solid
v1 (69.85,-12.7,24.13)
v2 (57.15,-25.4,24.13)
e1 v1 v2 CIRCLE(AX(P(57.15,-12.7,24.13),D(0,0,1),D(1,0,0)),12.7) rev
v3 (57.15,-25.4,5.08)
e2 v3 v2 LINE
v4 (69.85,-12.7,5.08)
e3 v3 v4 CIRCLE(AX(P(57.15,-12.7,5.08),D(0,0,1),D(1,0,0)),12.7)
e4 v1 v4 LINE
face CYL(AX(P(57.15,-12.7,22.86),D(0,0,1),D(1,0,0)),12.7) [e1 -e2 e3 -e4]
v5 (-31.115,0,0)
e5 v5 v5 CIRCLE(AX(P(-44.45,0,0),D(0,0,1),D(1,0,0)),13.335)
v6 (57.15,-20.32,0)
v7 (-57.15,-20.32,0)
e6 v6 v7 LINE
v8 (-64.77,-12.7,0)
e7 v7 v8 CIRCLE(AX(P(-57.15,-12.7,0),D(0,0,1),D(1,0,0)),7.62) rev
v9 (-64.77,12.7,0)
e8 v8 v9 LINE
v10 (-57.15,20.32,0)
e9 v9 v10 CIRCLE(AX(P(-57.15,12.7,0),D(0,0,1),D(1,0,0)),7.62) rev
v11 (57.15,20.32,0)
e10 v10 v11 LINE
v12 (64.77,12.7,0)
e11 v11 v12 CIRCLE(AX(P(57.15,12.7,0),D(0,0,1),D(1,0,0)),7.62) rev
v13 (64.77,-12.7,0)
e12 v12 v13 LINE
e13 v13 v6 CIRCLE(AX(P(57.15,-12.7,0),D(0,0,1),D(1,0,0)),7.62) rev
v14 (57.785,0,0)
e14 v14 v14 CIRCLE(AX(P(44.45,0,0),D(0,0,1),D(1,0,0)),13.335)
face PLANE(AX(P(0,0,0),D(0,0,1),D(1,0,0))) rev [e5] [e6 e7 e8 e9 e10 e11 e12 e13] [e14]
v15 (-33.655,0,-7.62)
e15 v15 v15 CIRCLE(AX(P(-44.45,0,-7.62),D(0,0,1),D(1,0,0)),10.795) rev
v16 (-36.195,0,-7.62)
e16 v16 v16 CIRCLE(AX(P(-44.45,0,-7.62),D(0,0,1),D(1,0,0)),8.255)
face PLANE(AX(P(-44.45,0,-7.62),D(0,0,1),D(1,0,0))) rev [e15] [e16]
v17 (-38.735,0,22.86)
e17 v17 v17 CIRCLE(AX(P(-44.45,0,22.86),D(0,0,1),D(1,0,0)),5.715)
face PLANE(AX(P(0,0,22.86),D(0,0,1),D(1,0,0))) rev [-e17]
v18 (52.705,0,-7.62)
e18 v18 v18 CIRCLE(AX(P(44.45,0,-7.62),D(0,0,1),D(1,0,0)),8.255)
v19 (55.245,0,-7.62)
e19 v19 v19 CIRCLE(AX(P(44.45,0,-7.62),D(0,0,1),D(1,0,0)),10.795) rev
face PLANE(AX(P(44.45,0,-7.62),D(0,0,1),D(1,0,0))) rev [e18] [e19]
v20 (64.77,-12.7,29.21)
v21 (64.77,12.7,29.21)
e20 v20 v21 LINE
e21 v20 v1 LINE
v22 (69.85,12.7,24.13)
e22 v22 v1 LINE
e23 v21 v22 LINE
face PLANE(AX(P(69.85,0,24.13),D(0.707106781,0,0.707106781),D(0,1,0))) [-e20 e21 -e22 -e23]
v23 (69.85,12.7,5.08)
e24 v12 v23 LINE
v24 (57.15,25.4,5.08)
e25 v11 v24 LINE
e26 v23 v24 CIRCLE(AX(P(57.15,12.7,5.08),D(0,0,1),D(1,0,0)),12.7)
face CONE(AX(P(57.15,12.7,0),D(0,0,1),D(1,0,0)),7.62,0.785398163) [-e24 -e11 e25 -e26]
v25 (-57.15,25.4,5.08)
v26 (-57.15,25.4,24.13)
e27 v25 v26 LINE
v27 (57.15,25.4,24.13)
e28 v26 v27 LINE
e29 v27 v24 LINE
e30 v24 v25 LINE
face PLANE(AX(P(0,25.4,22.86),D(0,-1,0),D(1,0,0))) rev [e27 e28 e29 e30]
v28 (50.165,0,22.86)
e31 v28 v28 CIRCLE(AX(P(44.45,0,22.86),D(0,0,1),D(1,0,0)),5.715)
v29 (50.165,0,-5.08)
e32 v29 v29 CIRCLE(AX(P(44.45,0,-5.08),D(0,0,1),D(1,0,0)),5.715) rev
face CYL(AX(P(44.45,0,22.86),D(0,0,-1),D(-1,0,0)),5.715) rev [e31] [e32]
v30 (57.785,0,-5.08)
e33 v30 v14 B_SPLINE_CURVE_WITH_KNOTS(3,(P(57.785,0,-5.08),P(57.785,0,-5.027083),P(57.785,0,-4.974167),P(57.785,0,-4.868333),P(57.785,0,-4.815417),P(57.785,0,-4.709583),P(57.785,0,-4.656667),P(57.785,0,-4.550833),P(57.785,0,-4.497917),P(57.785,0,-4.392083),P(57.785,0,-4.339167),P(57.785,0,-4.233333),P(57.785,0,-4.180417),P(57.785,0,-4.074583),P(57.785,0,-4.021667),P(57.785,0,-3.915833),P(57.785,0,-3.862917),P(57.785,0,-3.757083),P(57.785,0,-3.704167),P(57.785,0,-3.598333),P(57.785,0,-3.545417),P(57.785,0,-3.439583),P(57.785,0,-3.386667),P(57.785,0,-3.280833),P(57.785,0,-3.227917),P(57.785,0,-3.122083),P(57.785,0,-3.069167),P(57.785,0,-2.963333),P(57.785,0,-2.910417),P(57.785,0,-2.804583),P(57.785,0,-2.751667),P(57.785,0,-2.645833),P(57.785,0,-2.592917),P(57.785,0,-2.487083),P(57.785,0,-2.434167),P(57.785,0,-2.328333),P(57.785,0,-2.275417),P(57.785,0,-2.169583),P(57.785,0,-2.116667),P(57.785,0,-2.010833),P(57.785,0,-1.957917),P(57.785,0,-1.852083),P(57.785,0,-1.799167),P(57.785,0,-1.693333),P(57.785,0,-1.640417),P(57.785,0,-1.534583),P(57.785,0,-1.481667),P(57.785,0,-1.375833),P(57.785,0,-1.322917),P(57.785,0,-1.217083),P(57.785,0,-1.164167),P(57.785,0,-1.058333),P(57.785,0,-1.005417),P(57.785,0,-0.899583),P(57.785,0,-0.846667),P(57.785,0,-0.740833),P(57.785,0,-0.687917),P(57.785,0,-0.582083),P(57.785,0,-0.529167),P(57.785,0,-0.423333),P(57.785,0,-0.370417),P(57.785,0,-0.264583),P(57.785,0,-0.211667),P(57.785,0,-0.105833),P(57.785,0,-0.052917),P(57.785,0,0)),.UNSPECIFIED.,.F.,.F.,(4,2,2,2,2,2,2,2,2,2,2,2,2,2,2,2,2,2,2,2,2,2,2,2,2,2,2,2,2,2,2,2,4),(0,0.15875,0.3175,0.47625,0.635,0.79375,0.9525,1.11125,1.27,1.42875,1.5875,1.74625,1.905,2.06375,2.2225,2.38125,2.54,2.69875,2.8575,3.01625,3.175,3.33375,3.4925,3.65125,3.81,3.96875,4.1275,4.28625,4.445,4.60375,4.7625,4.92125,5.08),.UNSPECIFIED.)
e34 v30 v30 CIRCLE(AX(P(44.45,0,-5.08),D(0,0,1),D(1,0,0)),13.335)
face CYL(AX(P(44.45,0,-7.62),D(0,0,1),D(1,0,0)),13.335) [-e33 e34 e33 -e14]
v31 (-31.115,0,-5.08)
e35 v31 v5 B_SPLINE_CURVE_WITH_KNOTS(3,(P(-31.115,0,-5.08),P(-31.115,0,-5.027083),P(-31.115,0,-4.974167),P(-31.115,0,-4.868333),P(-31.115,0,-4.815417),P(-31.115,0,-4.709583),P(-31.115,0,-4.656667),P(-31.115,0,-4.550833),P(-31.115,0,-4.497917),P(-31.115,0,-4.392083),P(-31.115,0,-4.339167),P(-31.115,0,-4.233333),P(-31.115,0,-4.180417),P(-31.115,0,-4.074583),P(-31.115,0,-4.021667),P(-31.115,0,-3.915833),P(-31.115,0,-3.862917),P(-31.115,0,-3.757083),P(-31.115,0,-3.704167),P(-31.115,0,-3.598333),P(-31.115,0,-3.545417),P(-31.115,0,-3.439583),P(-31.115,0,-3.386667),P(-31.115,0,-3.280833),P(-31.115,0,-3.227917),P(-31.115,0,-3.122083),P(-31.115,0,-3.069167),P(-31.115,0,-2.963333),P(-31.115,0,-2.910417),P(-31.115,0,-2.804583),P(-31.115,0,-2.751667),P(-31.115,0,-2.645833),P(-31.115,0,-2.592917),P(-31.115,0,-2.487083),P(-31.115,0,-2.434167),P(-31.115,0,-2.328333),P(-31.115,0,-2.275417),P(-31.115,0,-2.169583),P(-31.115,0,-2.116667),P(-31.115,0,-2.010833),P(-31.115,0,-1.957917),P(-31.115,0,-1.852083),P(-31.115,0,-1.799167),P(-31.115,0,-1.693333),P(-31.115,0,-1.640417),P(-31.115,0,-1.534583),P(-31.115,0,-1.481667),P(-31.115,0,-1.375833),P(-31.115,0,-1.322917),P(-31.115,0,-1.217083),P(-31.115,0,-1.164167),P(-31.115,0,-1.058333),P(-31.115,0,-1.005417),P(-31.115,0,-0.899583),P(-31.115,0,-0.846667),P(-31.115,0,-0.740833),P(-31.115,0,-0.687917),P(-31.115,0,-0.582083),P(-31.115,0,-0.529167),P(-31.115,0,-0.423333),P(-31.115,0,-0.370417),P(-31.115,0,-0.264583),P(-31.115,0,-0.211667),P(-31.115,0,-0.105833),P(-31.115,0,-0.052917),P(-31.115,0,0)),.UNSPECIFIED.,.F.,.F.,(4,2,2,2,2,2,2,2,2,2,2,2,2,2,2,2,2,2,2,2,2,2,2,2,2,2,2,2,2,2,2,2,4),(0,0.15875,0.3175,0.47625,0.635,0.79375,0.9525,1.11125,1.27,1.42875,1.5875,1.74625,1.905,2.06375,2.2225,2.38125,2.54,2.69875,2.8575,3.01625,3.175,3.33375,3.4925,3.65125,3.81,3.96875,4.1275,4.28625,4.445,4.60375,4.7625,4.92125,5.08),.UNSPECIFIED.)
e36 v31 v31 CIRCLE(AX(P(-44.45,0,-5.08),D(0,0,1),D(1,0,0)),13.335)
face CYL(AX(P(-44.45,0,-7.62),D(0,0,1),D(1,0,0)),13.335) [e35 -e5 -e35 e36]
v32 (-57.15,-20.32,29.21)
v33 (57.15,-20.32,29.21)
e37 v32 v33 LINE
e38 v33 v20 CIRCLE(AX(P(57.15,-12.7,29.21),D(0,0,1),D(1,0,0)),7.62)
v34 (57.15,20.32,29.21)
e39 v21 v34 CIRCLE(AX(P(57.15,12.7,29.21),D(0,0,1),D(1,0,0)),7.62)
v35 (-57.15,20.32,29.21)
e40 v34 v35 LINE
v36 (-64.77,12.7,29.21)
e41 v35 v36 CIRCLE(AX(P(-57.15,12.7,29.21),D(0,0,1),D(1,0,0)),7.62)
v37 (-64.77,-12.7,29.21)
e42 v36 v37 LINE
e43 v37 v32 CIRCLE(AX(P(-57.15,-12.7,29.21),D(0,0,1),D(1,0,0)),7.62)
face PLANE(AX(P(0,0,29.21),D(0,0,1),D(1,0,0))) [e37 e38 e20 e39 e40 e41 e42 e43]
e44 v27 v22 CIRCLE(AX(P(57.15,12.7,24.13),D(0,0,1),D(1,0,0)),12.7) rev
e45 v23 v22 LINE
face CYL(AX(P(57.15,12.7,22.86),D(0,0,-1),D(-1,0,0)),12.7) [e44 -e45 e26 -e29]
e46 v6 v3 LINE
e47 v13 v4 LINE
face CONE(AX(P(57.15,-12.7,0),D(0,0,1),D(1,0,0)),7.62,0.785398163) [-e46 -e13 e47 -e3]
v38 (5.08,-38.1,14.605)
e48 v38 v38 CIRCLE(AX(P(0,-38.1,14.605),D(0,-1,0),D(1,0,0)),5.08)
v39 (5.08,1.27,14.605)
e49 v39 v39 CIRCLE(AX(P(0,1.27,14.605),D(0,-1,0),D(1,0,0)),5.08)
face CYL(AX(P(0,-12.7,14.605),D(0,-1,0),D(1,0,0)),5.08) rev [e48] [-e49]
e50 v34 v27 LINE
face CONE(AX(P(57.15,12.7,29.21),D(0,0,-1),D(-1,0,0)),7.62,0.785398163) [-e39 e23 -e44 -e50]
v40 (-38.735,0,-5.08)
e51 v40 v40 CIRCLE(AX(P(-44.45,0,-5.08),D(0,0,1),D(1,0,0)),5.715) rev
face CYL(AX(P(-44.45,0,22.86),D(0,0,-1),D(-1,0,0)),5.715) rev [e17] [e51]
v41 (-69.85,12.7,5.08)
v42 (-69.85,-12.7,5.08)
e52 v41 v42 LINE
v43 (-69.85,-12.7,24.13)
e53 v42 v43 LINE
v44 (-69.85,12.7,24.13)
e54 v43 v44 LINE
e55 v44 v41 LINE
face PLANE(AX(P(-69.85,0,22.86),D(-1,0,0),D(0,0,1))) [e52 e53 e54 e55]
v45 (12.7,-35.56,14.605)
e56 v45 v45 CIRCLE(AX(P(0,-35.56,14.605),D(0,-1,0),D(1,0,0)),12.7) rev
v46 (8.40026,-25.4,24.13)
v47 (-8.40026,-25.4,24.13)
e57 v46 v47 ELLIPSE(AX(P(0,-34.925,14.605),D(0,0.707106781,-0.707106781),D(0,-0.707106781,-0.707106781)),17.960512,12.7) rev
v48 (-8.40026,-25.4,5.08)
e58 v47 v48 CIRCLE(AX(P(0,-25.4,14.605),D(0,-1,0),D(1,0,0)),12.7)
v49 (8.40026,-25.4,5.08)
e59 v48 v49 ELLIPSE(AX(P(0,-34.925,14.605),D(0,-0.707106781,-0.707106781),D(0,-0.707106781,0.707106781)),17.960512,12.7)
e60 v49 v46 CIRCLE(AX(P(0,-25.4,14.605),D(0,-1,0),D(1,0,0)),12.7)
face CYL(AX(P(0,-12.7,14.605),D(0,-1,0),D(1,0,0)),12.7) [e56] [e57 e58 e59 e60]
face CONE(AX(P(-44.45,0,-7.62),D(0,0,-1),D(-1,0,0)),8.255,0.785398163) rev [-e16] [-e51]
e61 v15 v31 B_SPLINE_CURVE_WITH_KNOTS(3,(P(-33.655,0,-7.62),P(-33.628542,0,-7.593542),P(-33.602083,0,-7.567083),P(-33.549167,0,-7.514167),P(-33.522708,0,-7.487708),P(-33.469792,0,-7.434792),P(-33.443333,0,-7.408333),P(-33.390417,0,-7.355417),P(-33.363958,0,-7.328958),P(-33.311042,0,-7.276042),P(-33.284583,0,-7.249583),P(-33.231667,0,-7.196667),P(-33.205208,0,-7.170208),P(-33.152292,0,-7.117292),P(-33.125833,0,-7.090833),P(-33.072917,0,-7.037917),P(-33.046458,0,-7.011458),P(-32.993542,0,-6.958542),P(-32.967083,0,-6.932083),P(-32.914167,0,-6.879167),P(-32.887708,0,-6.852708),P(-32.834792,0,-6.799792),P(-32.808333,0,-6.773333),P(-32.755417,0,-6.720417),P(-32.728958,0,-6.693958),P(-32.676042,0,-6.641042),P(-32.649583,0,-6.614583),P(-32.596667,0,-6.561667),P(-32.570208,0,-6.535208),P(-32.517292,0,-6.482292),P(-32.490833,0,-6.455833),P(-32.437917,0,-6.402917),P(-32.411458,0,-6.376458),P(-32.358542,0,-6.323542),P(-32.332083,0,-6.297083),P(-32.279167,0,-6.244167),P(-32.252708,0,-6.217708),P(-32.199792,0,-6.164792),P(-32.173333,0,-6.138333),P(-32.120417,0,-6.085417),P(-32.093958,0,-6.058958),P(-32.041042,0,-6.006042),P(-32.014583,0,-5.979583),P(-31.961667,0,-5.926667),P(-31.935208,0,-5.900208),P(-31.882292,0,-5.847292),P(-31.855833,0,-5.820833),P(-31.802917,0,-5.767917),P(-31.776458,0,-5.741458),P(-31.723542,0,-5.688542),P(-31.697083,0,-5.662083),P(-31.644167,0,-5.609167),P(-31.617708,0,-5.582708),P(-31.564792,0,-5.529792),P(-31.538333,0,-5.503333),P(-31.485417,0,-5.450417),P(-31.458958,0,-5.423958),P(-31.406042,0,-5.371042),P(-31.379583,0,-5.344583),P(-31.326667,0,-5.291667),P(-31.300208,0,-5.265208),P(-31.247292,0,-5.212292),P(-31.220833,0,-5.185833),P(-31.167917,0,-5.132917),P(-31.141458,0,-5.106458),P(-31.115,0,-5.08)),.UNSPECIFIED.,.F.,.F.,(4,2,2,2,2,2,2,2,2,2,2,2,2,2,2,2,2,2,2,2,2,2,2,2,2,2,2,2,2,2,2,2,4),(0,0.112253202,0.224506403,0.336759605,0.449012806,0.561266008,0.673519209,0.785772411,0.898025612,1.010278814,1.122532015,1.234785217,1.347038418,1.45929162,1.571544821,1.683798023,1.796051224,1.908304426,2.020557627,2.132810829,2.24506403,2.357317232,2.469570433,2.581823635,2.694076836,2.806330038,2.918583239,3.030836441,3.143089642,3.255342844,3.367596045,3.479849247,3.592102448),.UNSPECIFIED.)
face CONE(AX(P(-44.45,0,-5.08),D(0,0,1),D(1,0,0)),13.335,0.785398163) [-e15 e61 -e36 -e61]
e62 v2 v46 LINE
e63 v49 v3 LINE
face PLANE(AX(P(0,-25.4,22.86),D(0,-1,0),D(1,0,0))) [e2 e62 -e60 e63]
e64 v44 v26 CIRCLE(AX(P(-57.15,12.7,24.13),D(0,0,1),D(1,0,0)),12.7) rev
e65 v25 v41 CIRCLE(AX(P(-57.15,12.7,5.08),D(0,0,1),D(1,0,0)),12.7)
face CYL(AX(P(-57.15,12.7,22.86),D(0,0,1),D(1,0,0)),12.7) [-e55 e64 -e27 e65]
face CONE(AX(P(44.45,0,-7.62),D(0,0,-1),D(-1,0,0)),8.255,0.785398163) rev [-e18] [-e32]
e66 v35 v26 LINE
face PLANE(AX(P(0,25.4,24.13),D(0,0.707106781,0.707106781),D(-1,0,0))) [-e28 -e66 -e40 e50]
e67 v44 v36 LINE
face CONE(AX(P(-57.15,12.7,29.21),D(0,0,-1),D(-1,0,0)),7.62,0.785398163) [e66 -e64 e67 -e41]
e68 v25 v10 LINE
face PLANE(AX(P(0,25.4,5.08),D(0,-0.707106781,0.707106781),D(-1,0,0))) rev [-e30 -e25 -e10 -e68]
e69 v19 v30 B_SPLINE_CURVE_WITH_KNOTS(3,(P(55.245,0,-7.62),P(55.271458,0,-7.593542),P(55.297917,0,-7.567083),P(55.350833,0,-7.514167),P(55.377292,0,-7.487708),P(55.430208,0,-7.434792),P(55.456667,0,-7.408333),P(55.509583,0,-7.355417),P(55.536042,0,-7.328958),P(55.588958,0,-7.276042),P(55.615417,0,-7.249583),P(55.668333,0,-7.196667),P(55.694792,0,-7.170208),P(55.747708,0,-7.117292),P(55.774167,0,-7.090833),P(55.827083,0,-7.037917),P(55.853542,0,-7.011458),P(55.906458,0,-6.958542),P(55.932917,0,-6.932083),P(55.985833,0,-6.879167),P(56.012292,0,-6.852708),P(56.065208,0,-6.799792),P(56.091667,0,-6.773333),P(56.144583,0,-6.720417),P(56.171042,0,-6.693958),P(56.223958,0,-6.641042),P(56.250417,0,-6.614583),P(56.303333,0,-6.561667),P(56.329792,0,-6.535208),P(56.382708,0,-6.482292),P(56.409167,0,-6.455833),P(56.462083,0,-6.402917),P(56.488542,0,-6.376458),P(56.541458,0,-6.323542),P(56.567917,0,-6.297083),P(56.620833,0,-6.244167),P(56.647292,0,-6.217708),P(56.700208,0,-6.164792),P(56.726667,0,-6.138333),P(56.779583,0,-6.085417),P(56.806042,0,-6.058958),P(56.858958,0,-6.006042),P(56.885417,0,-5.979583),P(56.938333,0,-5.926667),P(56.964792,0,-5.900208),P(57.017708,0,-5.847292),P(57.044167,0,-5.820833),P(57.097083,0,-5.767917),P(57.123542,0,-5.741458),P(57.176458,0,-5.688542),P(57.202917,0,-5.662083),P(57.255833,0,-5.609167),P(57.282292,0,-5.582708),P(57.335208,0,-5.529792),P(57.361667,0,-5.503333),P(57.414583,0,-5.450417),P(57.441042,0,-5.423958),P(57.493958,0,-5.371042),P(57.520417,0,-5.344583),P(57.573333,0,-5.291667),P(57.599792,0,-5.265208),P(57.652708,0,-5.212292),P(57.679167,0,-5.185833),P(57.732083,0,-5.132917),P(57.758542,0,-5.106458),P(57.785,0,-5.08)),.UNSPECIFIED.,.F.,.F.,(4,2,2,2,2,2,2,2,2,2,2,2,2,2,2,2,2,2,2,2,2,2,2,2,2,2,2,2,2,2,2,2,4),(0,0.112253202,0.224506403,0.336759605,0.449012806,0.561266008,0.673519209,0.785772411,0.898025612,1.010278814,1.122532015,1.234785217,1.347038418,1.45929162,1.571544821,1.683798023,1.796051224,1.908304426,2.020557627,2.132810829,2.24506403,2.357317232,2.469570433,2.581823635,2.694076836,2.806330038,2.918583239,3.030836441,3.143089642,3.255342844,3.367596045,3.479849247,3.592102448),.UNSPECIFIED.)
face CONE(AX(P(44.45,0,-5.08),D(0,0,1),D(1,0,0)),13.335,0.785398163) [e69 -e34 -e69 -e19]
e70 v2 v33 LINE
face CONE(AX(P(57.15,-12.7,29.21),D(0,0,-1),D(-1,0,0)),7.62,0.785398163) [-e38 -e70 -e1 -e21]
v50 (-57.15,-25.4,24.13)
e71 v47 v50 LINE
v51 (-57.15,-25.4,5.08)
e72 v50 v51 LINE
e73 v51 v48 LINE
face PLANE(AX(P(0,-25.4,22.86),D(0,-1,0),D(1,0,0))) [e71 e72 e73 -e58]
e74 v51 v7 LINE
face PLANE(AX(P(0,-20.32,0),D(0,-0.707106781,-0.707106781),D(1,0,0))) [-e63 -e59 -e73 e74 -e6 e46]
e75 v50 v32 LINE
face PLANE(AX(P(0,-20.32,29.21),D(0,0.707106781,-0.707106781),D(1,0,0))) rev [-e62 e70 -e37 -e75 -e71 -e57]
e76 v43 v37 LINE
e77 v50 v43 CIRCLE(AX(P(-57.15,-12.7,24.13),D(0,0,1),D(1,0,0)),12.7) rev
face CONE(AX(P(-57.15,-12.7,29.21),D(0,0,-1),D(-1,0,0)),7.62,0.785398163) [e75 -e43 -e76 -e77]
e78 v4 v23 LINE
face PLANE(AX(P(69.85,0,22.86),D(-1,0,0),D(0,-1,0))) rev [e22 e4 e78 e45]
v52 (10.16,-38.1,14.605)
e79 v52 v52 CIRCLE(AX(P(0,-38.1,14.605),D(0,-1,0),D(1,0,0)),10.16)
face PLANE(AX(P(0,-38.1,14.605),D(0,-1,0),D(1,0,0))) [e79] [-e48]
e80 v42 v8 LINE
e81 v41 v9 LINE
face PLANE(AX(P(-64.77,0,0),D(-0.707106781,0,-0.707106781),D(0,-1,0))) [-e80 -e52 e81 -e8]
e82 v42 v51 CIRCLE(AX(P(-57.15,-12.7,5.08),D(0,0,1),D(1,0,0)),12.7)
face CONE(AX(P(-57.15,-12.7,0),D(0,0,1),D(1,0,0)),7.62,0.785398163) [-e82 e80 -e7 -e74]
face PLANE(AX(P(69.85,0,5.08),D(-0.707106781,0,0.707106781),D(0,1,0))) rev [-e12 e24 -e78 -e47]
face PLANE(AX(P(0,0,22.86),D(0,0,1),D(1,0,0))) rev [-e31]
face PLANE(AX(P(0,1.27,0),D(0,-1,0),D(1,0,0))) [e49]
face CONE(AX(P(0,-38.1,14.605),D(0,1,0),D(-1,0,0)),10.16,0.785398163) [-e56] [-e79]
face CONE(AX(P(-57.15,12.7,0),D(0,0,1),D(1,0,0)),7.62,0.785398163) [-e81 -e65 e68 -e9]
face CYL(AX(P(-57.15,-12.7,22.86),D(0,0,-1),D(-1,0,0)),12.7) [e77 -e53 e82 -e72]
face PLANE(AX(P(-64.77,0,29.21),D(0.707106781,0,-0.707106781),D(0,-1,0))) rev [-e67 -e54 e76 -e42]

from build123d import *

# Parameters (mm, degrees)
SKETCH1_W                = 139.7
SKETCH1_H                = 50.8
SKETCH1_R                = 5.715
BOSS_EXTRUDE1_DEPTH      = 22.86
BOSS_EXTRUDE2_START      = 22.86
BOSS_EXTRUDE2_OUTLINE_W  = 139.7
BOSS_EXTRUDE2_OUTLINE_H  = 50.8
BOSS_EXTRUDE2_DEPTH      = 6.35
EXTRUDE_THIN1_START      = -7.62
SKETCH1_4_R              = 13.335
SKETCH1_4_R_2            = 5.715
EXTRUDE_THIN1_DEPTH      = 7.62
FILLET1_R                = 12.7
CHAMFER1_SIZE            = 5.08
CHAMFER3_SIZE            = 2.54
BOSS_EXTRUDE3_DEPTH      = 12.7
BOSS_EXTRUDE3_DEPTH_BACK = 12.7
SKETCH2_R                = 12.7
SKETCH2_R_2              = 5.08
CUT_EXTRUDE1_START       = -26.67
SKETCH2_2_R              = 5.08
CUT_EXTRUDE1_DEPTH       = 26.67
CHAMFER2_SIZE            = 2.54


# Read off the part's stored shape, not the designer's step: Boss-Extrude2
with BuildPart() as part:
    # Sketch1 → Boss-Extrude1 (new body)
    with BuildSketch(Plane.XY):
        Rectangle(SKETCH1_W, SKETCH1_H)
        with Locations((44.45, 0)):
            Circle(SKETCH1_R, mode=Mode.SUBTRACT)
        with Locations((-44.45, 0)):
            Circle(SKETCH1_R, mode=Mode.SUBTRACT)
    extrude(amount=BOSS_EXTRUDE1_DEPTH)

    # Boss-Extrude2 outline → Boss-Extrude2 (add)
    with BuildSketch(Plane.XY.offset(BOSS_EXTRUDE2_START)):
        Rectangle(BOSS_EXTRUDE2_OUTLINE_W, BOSS_EXTRUDE2_OUTLINE_H)
    extrude(amount=BOSS_EXTRUDE2_DEPTH)

    # Sketch1<4> → Extrude-Thin1 (add)
    # profile 1 of 2: a face of its own
    with BuildSketch(Plane.XY.offset(EXTRUDE_THIN1_START)):
        with Locations((44.45, 0)):
            Circle(SKETCH1_4_R)
        with Locations((44.45, 0)):
            Circle(SKETCH1_4_R_2, mode=Mode.SUBTRACT)
    # profile 2 of 2: a face of its own
    with BuildSketch(Plane.XY.offset(EXTRUDE_THIN1_START)):
        with Locations((-44.45, 0)):
            Circle(SKETCH1_4_R)
        with Locations((-44.45, 0)):
            Circle(SKETCH1_4_R_2, mode=Mode.SUBTRACT)
    extrude(amount=EXTRUDE_THIN1_DEPTH)

    # Fillet1
    fillet1_edges = [part.edges().sort_by_distance(p)[0] for p in [
        (-69.85, 25.4, 14.605),
        (69.85, 25.4, 14.605),
        (69.85, -25.4, 14.605),
        (-69.85, -25.4, 14.605),
    ]]
    fillet(fillet1_edges, radius=FILLET1_R)

    # Chamfer1
    chamfer1_edges = [part.edges().sort_by_distance(p)[0] for p in [
        (0, -25.4, 0),
        (0, -25.4, 29.21),
        (-69.85, 0, 0),
        (0, 25.4, 0),
        (69.85, 0, 0),
        (-66.130256121, 21.680256121, 0),
        (66.130256121, 21.680256121, 0),
        (66.130256121, -21.680256121, 0),
        (-66.130256121, -21.680256121, 0),
        (-69.85, 0, 29.21),
        (69.85, 0, 29.21),
        (0, 25.4, 29.21),
        (-66.130256121, 21.680256121, 29.21),
        (66.130256121, 21.680256121, 29.21),
        (66.130256121, -21.680256121, 29.21),
        (-66.130256121, -21.680256121, 29.21),
    ]]
    chamfer(chamfer1_edges, length=CHAMFER1_SIZE)

    # Chamfer3
    chamfer3_edges = [part.edges().sort_by_distance(p)[0] for p in [
        (31.115, 0, -7.62),
        (38.735, 0, -7.62),
        (-57.785, 0, -7.62),
        (-50.165, 0, -7.62),
    ]]
    chamfer(chamfer3_edges, length=CHAMFER3_SIZE)

    # Sketch2 → Boss-Extrude3 (add, two sides: drawn at the far end of the back side and taken through both)
    with BuildSketch(Plane.XZ.offset(25.4).offset(-BOSS_EXTRUDE3_DEPTH_BACK)):
        with Locations((0, 14.605)):
            Circle(SKETCH2_R)
        with Locations((0, 14.605)):
            Circle(SKETCH2_R_2, mode=Mode.SUBTRACT)
    extrude(amount=BOSS_EXTRUDE3_DEPTH + BOSS_EXTRUDE3_DEPTH_BACK)

    # Sketch2<2> → Cut-Extrude1 (cut)
    with BuildSketch(Plane.XZ.offset(25.4).offset(CUT_EXTRUDE1_START)):
        with Locations((0, 14.605)):
            Circle(SKETCH2_2_R)
    extrude(amount=CUT_EXTRUDE1_DEPTH, mode=Mode.SUBTRACT)

    # Chamfer2
    chamfer2_edges = [part.edges().sort_by_distance(p)[0] for p in [
        (-12.7, -38.1, 14.605),
    ]]
    chamfer(chamfer2_edges, length=CHAMFER2_SIZE)


solid = part.part
